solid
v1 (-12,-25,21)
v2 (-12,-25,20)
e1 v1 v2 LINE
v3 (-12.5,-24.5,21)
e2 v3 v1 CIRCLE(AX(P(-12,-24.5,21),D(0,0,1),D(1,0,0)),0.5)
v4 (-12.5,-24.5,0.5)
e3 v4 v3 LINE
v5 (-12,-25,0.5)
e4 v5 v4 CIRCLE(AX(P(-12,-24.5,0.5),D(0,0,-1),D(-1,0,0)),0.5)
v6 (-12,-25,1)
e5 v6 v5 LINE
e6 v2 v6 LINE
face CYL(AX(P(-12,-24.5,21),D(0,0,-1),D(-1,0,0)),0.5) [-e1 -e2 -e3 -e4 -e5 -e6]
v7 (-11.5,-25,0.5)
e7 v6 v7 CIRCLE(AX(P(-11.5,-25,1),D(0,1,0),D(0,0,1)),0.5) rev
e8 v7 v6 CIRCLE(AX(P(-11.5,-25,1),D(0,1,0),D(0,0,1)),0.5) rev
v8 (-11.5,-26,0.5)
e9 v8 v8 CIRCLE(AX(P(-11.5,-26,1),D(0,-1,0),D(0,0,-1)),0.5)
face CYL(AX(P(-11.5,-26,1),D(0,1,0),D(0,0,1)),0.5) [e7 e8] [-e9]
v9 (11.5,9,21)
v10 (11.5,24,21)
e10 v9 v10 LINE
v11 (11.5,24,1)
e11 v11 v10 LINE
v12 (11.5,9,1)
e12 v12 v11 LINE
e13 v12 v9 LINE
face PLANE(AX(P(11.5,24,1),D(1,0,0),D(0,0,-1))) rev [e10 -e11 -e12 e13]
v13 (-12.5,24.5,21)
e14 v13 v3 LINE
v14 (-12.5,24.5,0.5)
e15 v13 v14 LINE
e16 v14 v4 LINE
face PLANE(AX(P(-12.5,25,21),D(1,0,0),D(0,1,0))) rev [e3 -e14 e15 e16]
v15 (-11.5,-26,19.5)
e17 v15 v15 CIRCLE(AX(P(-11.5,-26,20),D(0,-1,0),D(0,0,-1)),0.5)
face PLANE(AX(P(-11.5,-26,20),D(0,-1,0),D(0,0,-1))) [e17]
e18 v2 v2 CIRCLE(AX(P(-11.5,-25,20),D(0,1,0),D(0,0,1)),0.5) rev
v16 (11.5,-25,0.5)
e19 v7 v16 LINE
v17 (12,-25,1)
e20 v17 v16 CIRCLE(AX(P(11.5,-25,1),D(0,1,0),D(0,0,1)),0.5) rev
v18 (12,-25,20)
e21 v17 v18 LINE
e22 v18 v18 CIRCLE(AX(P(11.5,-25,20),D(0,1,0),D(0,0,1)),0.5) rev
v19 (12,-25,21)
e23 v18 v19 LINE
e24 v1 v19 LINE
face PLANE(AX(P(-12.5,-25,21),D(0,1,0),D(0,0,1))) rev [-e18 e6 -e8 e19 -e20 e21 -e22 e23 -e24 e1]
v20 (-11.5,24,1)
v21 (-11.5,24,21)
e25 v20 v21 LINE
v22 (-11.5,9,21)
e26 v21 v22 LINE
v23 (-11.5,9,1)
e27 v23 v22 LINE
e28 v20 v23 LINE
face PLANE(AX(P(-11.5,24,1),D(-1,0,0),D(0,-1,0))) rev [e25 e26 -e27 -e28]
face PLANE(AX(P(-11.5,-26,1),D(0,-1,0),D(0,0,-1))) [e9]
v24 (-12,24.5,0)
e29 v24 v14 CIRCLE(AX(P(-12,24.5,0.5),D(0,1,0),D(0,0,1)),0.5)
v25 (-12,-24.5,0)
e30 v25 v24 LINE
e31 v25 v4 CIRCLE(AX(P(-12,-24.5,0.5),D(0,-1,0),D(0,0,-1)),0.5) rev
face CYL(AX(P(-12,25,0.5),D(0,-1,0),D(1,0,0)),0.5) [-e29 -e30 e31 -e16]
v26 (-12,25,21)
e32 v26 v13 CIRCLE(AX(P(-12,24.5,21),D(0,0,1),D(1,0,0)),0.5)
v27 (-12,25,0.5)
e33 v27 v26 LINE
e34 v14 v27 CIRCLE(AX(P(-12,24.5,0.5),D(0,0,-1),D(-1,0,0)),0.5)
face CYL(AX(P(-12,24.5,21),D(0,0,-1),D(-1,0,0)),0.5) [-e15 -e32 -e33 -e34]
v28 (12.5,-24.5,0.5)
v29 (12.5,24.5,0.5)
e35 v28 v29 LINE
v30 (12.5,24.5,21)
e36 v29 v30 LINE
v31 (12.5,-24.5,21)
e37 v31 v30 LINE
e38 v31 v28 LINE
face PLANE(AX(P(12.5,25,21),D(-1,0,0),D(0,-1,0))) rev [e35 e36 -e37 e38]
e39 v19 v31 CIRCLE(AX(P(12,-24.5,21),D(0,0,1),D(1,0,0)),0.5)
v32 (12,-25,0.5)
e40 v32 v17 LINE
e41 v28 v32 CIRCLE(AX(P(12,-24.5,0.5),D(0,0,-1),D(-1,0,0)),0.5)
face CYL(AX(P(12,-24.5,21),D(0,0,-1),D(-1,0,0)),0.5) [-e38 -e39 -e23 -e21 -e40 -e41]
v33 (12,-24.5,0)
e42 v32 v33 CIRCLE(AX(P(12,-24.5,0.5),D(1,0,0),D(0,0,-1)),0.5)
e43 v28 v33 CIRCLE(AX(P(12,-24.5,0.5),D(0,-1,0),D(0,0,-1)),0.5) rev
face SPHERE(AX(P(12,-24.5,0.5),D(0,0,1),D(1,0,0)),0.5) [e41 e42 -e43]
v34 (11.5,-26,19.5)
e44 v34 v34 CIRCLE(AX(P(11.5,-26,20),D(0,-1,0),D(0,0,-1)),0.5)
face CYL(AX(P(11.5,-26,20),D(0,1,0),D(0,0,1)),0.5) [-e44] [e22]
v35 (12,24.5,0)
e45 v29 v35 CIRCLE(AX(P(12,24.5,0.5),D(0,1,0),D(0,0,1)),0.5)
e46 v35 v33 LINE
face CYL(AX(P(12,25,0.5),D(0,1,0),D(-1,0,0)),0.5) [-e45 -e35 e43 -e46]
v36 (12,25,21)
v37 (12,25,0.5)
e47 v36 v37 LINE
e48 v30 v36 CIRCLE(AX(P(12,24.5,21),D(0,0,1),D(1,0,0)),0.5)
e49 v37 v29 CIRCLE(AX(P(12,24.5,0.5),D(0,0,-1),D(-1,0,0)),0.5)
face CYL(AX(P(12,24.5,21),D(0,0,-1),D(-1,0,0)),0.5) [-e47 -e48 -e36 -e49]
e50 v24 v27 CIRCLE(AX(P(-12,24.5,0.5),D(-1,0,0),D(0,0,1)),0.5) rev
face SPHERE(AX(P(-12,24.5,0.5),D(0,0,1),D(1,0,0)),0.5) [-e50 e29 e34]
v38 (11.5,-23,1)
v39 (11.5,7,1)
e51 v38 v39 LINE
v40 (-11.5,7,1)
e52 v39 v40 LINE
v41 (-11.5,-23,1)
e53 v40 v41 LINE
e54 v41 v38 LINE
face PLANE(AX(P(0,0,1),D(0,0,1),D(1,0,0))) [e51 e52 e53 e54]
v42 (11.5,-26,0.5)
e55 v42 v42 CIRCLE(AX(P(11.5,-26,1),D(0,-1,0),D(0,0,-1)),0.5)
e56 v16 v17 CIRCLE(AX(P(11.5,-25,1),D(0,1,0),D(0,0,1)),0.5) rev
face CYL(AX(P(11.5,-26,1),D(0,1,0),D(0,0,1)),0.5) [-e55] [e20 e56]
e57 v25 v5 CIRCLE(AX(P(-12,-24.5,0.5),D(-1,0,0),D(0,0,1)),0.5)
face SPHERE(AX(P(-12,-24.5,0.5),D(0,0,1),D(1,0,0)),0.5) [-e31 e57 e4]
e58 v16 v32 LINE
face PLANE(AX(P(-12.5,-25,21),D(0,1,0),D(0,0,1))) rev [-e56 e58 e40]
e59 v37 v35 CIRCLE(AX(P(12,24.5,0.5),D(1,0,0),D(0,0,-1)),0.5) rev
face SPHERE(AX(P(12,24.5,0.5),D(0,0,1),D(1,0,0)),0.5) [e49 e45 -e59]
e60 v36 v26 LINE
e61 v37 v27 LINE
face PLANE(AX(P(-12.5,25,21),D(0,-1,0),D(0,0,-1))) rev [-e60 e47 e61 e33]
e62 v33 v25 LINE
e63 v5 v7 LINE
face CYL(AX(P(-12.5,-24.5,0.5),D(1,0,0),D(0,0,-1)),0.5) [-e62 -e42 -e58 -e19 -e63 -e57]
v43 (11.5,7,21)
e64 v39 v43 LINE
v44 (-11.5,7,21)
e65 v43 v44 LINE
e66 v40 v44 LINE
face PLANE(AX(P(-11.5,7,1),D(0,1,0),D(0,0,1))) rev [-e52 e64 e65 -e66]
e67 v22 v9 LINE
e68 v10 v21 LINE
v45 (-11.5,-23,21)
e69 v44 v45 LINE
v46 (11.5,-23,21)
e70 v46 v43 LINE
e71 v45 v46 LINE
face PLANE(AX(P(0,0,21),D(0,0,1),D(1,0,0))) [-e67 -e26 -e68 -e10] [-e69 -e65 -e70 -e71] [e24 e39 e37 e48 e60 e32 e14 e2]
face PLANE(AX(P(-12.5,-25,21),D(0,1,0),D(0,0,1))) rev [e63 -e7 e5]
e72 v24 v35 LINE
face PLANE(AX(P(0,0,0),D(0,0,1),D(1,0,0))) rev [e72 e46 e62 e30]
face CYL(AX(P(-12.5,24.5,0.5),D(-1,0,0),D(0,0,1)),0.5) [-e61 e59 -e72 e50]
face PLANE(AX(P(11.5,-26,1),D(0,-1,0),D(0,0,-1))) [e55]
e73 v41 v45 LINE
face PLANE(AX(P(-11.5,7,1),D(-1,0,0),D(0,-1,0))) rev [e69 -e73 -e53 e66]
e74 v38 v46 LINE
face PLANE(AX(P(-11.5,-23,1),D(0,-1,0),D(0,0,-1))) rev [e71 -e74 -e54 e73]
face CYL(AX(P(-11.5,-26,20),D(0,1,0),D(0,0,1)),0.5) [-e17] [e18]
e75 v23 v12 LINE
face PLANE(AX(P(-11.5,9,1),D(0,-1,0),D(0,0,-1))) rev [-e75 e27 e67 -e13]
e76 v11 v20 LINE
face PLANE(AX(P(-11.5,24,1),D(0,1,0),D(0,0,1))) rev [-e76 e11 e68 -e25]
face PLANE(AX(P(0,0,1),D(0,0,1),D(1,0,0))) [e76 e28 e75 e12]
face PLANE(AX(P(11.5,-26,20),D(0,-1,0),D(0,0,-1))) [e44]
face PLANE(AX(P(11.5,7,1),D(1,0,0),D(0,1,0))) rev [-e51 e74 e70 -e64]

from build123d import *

# Parameters (mm, degrees)
SKETCH_1_W          = 25
SKETCH_1_H          = 50
EXTRUDE_1_DEPTH     = 21
SKETCH_2_W          = 23
SKETCH_2_H          = 15
SKETCH_2_H_2        = 30
CUT_EXTRUDE_1_DEPTH = 20
SKETCH_3_R          = 0.5
EXTRUDE_2_DEPTH     = 1
FILLET_1_R          = 0.5


with BuildPart() as part:
    # 草圖1 → 填料-伸長1 (new body)
    with BuildSketch(Plane.XY):
        Rectangle(SKETCH_1_W, SKETCH_1_H)
    extrude(amount=EXTRUDE_1_DEPTH)

    # 草圖2 → 除料-伸長1 (cut)
    with BuildSketch(Plane.XY.offset(21)):
        with Locations((0, 16.5)):
            Rectangle(SKETCH_2_W, SKETCH_2_H)
        with Locations((0, -8)):
            Rectangle(SKETCH_2_W, SKETCH_2_H_2)
    extrude(amount=-CUT_EXTRUDE_1_DEPTH, mode=Mode.SUBTRACT)

    # 草圖3 → 填料-伸長2 (add)
    with BuildSketch(Plane.XZ.offset(25)):
        with Locations(Location((-11.5, 20, 0), (0, 0, 90))):
            Circle(SKETCH_3_R)
        with Locations(Location((11.5, 20, 0), (0, 0, 90))):
            Circle(SKETCH_3_R)
        with Locations(Location((11.5, 1, 0), (0, 0, 90))):
            Circle(SKETCH_3_R)
        with Locations(Location((-11.5, 1, 0), (0, 0, 90))):
            Circle(SKETCH_3_R)
    extrude(amount=EXTRUDE_2_DEPTH)

    # 圓角1
    fillet_1_edges = [part.edges().sort_by_distance(p)[0] for p in [
        (0, -25, 0),
        (-12.5, 0, 0),
        (0, 25, 0),
        (12.5, 0, 0),
        (12.5, -25, 10.5),
        (-12.5, -25, 10.5),
        (-12.5, 25, 10.5),
        (12.5, 25, 10.5),
    ]]
    fillet(fillet_1_edges, radius=FILLET_1_R - 0.0001)  # a hair under: the kernel refuses the full size


solid = part.part
